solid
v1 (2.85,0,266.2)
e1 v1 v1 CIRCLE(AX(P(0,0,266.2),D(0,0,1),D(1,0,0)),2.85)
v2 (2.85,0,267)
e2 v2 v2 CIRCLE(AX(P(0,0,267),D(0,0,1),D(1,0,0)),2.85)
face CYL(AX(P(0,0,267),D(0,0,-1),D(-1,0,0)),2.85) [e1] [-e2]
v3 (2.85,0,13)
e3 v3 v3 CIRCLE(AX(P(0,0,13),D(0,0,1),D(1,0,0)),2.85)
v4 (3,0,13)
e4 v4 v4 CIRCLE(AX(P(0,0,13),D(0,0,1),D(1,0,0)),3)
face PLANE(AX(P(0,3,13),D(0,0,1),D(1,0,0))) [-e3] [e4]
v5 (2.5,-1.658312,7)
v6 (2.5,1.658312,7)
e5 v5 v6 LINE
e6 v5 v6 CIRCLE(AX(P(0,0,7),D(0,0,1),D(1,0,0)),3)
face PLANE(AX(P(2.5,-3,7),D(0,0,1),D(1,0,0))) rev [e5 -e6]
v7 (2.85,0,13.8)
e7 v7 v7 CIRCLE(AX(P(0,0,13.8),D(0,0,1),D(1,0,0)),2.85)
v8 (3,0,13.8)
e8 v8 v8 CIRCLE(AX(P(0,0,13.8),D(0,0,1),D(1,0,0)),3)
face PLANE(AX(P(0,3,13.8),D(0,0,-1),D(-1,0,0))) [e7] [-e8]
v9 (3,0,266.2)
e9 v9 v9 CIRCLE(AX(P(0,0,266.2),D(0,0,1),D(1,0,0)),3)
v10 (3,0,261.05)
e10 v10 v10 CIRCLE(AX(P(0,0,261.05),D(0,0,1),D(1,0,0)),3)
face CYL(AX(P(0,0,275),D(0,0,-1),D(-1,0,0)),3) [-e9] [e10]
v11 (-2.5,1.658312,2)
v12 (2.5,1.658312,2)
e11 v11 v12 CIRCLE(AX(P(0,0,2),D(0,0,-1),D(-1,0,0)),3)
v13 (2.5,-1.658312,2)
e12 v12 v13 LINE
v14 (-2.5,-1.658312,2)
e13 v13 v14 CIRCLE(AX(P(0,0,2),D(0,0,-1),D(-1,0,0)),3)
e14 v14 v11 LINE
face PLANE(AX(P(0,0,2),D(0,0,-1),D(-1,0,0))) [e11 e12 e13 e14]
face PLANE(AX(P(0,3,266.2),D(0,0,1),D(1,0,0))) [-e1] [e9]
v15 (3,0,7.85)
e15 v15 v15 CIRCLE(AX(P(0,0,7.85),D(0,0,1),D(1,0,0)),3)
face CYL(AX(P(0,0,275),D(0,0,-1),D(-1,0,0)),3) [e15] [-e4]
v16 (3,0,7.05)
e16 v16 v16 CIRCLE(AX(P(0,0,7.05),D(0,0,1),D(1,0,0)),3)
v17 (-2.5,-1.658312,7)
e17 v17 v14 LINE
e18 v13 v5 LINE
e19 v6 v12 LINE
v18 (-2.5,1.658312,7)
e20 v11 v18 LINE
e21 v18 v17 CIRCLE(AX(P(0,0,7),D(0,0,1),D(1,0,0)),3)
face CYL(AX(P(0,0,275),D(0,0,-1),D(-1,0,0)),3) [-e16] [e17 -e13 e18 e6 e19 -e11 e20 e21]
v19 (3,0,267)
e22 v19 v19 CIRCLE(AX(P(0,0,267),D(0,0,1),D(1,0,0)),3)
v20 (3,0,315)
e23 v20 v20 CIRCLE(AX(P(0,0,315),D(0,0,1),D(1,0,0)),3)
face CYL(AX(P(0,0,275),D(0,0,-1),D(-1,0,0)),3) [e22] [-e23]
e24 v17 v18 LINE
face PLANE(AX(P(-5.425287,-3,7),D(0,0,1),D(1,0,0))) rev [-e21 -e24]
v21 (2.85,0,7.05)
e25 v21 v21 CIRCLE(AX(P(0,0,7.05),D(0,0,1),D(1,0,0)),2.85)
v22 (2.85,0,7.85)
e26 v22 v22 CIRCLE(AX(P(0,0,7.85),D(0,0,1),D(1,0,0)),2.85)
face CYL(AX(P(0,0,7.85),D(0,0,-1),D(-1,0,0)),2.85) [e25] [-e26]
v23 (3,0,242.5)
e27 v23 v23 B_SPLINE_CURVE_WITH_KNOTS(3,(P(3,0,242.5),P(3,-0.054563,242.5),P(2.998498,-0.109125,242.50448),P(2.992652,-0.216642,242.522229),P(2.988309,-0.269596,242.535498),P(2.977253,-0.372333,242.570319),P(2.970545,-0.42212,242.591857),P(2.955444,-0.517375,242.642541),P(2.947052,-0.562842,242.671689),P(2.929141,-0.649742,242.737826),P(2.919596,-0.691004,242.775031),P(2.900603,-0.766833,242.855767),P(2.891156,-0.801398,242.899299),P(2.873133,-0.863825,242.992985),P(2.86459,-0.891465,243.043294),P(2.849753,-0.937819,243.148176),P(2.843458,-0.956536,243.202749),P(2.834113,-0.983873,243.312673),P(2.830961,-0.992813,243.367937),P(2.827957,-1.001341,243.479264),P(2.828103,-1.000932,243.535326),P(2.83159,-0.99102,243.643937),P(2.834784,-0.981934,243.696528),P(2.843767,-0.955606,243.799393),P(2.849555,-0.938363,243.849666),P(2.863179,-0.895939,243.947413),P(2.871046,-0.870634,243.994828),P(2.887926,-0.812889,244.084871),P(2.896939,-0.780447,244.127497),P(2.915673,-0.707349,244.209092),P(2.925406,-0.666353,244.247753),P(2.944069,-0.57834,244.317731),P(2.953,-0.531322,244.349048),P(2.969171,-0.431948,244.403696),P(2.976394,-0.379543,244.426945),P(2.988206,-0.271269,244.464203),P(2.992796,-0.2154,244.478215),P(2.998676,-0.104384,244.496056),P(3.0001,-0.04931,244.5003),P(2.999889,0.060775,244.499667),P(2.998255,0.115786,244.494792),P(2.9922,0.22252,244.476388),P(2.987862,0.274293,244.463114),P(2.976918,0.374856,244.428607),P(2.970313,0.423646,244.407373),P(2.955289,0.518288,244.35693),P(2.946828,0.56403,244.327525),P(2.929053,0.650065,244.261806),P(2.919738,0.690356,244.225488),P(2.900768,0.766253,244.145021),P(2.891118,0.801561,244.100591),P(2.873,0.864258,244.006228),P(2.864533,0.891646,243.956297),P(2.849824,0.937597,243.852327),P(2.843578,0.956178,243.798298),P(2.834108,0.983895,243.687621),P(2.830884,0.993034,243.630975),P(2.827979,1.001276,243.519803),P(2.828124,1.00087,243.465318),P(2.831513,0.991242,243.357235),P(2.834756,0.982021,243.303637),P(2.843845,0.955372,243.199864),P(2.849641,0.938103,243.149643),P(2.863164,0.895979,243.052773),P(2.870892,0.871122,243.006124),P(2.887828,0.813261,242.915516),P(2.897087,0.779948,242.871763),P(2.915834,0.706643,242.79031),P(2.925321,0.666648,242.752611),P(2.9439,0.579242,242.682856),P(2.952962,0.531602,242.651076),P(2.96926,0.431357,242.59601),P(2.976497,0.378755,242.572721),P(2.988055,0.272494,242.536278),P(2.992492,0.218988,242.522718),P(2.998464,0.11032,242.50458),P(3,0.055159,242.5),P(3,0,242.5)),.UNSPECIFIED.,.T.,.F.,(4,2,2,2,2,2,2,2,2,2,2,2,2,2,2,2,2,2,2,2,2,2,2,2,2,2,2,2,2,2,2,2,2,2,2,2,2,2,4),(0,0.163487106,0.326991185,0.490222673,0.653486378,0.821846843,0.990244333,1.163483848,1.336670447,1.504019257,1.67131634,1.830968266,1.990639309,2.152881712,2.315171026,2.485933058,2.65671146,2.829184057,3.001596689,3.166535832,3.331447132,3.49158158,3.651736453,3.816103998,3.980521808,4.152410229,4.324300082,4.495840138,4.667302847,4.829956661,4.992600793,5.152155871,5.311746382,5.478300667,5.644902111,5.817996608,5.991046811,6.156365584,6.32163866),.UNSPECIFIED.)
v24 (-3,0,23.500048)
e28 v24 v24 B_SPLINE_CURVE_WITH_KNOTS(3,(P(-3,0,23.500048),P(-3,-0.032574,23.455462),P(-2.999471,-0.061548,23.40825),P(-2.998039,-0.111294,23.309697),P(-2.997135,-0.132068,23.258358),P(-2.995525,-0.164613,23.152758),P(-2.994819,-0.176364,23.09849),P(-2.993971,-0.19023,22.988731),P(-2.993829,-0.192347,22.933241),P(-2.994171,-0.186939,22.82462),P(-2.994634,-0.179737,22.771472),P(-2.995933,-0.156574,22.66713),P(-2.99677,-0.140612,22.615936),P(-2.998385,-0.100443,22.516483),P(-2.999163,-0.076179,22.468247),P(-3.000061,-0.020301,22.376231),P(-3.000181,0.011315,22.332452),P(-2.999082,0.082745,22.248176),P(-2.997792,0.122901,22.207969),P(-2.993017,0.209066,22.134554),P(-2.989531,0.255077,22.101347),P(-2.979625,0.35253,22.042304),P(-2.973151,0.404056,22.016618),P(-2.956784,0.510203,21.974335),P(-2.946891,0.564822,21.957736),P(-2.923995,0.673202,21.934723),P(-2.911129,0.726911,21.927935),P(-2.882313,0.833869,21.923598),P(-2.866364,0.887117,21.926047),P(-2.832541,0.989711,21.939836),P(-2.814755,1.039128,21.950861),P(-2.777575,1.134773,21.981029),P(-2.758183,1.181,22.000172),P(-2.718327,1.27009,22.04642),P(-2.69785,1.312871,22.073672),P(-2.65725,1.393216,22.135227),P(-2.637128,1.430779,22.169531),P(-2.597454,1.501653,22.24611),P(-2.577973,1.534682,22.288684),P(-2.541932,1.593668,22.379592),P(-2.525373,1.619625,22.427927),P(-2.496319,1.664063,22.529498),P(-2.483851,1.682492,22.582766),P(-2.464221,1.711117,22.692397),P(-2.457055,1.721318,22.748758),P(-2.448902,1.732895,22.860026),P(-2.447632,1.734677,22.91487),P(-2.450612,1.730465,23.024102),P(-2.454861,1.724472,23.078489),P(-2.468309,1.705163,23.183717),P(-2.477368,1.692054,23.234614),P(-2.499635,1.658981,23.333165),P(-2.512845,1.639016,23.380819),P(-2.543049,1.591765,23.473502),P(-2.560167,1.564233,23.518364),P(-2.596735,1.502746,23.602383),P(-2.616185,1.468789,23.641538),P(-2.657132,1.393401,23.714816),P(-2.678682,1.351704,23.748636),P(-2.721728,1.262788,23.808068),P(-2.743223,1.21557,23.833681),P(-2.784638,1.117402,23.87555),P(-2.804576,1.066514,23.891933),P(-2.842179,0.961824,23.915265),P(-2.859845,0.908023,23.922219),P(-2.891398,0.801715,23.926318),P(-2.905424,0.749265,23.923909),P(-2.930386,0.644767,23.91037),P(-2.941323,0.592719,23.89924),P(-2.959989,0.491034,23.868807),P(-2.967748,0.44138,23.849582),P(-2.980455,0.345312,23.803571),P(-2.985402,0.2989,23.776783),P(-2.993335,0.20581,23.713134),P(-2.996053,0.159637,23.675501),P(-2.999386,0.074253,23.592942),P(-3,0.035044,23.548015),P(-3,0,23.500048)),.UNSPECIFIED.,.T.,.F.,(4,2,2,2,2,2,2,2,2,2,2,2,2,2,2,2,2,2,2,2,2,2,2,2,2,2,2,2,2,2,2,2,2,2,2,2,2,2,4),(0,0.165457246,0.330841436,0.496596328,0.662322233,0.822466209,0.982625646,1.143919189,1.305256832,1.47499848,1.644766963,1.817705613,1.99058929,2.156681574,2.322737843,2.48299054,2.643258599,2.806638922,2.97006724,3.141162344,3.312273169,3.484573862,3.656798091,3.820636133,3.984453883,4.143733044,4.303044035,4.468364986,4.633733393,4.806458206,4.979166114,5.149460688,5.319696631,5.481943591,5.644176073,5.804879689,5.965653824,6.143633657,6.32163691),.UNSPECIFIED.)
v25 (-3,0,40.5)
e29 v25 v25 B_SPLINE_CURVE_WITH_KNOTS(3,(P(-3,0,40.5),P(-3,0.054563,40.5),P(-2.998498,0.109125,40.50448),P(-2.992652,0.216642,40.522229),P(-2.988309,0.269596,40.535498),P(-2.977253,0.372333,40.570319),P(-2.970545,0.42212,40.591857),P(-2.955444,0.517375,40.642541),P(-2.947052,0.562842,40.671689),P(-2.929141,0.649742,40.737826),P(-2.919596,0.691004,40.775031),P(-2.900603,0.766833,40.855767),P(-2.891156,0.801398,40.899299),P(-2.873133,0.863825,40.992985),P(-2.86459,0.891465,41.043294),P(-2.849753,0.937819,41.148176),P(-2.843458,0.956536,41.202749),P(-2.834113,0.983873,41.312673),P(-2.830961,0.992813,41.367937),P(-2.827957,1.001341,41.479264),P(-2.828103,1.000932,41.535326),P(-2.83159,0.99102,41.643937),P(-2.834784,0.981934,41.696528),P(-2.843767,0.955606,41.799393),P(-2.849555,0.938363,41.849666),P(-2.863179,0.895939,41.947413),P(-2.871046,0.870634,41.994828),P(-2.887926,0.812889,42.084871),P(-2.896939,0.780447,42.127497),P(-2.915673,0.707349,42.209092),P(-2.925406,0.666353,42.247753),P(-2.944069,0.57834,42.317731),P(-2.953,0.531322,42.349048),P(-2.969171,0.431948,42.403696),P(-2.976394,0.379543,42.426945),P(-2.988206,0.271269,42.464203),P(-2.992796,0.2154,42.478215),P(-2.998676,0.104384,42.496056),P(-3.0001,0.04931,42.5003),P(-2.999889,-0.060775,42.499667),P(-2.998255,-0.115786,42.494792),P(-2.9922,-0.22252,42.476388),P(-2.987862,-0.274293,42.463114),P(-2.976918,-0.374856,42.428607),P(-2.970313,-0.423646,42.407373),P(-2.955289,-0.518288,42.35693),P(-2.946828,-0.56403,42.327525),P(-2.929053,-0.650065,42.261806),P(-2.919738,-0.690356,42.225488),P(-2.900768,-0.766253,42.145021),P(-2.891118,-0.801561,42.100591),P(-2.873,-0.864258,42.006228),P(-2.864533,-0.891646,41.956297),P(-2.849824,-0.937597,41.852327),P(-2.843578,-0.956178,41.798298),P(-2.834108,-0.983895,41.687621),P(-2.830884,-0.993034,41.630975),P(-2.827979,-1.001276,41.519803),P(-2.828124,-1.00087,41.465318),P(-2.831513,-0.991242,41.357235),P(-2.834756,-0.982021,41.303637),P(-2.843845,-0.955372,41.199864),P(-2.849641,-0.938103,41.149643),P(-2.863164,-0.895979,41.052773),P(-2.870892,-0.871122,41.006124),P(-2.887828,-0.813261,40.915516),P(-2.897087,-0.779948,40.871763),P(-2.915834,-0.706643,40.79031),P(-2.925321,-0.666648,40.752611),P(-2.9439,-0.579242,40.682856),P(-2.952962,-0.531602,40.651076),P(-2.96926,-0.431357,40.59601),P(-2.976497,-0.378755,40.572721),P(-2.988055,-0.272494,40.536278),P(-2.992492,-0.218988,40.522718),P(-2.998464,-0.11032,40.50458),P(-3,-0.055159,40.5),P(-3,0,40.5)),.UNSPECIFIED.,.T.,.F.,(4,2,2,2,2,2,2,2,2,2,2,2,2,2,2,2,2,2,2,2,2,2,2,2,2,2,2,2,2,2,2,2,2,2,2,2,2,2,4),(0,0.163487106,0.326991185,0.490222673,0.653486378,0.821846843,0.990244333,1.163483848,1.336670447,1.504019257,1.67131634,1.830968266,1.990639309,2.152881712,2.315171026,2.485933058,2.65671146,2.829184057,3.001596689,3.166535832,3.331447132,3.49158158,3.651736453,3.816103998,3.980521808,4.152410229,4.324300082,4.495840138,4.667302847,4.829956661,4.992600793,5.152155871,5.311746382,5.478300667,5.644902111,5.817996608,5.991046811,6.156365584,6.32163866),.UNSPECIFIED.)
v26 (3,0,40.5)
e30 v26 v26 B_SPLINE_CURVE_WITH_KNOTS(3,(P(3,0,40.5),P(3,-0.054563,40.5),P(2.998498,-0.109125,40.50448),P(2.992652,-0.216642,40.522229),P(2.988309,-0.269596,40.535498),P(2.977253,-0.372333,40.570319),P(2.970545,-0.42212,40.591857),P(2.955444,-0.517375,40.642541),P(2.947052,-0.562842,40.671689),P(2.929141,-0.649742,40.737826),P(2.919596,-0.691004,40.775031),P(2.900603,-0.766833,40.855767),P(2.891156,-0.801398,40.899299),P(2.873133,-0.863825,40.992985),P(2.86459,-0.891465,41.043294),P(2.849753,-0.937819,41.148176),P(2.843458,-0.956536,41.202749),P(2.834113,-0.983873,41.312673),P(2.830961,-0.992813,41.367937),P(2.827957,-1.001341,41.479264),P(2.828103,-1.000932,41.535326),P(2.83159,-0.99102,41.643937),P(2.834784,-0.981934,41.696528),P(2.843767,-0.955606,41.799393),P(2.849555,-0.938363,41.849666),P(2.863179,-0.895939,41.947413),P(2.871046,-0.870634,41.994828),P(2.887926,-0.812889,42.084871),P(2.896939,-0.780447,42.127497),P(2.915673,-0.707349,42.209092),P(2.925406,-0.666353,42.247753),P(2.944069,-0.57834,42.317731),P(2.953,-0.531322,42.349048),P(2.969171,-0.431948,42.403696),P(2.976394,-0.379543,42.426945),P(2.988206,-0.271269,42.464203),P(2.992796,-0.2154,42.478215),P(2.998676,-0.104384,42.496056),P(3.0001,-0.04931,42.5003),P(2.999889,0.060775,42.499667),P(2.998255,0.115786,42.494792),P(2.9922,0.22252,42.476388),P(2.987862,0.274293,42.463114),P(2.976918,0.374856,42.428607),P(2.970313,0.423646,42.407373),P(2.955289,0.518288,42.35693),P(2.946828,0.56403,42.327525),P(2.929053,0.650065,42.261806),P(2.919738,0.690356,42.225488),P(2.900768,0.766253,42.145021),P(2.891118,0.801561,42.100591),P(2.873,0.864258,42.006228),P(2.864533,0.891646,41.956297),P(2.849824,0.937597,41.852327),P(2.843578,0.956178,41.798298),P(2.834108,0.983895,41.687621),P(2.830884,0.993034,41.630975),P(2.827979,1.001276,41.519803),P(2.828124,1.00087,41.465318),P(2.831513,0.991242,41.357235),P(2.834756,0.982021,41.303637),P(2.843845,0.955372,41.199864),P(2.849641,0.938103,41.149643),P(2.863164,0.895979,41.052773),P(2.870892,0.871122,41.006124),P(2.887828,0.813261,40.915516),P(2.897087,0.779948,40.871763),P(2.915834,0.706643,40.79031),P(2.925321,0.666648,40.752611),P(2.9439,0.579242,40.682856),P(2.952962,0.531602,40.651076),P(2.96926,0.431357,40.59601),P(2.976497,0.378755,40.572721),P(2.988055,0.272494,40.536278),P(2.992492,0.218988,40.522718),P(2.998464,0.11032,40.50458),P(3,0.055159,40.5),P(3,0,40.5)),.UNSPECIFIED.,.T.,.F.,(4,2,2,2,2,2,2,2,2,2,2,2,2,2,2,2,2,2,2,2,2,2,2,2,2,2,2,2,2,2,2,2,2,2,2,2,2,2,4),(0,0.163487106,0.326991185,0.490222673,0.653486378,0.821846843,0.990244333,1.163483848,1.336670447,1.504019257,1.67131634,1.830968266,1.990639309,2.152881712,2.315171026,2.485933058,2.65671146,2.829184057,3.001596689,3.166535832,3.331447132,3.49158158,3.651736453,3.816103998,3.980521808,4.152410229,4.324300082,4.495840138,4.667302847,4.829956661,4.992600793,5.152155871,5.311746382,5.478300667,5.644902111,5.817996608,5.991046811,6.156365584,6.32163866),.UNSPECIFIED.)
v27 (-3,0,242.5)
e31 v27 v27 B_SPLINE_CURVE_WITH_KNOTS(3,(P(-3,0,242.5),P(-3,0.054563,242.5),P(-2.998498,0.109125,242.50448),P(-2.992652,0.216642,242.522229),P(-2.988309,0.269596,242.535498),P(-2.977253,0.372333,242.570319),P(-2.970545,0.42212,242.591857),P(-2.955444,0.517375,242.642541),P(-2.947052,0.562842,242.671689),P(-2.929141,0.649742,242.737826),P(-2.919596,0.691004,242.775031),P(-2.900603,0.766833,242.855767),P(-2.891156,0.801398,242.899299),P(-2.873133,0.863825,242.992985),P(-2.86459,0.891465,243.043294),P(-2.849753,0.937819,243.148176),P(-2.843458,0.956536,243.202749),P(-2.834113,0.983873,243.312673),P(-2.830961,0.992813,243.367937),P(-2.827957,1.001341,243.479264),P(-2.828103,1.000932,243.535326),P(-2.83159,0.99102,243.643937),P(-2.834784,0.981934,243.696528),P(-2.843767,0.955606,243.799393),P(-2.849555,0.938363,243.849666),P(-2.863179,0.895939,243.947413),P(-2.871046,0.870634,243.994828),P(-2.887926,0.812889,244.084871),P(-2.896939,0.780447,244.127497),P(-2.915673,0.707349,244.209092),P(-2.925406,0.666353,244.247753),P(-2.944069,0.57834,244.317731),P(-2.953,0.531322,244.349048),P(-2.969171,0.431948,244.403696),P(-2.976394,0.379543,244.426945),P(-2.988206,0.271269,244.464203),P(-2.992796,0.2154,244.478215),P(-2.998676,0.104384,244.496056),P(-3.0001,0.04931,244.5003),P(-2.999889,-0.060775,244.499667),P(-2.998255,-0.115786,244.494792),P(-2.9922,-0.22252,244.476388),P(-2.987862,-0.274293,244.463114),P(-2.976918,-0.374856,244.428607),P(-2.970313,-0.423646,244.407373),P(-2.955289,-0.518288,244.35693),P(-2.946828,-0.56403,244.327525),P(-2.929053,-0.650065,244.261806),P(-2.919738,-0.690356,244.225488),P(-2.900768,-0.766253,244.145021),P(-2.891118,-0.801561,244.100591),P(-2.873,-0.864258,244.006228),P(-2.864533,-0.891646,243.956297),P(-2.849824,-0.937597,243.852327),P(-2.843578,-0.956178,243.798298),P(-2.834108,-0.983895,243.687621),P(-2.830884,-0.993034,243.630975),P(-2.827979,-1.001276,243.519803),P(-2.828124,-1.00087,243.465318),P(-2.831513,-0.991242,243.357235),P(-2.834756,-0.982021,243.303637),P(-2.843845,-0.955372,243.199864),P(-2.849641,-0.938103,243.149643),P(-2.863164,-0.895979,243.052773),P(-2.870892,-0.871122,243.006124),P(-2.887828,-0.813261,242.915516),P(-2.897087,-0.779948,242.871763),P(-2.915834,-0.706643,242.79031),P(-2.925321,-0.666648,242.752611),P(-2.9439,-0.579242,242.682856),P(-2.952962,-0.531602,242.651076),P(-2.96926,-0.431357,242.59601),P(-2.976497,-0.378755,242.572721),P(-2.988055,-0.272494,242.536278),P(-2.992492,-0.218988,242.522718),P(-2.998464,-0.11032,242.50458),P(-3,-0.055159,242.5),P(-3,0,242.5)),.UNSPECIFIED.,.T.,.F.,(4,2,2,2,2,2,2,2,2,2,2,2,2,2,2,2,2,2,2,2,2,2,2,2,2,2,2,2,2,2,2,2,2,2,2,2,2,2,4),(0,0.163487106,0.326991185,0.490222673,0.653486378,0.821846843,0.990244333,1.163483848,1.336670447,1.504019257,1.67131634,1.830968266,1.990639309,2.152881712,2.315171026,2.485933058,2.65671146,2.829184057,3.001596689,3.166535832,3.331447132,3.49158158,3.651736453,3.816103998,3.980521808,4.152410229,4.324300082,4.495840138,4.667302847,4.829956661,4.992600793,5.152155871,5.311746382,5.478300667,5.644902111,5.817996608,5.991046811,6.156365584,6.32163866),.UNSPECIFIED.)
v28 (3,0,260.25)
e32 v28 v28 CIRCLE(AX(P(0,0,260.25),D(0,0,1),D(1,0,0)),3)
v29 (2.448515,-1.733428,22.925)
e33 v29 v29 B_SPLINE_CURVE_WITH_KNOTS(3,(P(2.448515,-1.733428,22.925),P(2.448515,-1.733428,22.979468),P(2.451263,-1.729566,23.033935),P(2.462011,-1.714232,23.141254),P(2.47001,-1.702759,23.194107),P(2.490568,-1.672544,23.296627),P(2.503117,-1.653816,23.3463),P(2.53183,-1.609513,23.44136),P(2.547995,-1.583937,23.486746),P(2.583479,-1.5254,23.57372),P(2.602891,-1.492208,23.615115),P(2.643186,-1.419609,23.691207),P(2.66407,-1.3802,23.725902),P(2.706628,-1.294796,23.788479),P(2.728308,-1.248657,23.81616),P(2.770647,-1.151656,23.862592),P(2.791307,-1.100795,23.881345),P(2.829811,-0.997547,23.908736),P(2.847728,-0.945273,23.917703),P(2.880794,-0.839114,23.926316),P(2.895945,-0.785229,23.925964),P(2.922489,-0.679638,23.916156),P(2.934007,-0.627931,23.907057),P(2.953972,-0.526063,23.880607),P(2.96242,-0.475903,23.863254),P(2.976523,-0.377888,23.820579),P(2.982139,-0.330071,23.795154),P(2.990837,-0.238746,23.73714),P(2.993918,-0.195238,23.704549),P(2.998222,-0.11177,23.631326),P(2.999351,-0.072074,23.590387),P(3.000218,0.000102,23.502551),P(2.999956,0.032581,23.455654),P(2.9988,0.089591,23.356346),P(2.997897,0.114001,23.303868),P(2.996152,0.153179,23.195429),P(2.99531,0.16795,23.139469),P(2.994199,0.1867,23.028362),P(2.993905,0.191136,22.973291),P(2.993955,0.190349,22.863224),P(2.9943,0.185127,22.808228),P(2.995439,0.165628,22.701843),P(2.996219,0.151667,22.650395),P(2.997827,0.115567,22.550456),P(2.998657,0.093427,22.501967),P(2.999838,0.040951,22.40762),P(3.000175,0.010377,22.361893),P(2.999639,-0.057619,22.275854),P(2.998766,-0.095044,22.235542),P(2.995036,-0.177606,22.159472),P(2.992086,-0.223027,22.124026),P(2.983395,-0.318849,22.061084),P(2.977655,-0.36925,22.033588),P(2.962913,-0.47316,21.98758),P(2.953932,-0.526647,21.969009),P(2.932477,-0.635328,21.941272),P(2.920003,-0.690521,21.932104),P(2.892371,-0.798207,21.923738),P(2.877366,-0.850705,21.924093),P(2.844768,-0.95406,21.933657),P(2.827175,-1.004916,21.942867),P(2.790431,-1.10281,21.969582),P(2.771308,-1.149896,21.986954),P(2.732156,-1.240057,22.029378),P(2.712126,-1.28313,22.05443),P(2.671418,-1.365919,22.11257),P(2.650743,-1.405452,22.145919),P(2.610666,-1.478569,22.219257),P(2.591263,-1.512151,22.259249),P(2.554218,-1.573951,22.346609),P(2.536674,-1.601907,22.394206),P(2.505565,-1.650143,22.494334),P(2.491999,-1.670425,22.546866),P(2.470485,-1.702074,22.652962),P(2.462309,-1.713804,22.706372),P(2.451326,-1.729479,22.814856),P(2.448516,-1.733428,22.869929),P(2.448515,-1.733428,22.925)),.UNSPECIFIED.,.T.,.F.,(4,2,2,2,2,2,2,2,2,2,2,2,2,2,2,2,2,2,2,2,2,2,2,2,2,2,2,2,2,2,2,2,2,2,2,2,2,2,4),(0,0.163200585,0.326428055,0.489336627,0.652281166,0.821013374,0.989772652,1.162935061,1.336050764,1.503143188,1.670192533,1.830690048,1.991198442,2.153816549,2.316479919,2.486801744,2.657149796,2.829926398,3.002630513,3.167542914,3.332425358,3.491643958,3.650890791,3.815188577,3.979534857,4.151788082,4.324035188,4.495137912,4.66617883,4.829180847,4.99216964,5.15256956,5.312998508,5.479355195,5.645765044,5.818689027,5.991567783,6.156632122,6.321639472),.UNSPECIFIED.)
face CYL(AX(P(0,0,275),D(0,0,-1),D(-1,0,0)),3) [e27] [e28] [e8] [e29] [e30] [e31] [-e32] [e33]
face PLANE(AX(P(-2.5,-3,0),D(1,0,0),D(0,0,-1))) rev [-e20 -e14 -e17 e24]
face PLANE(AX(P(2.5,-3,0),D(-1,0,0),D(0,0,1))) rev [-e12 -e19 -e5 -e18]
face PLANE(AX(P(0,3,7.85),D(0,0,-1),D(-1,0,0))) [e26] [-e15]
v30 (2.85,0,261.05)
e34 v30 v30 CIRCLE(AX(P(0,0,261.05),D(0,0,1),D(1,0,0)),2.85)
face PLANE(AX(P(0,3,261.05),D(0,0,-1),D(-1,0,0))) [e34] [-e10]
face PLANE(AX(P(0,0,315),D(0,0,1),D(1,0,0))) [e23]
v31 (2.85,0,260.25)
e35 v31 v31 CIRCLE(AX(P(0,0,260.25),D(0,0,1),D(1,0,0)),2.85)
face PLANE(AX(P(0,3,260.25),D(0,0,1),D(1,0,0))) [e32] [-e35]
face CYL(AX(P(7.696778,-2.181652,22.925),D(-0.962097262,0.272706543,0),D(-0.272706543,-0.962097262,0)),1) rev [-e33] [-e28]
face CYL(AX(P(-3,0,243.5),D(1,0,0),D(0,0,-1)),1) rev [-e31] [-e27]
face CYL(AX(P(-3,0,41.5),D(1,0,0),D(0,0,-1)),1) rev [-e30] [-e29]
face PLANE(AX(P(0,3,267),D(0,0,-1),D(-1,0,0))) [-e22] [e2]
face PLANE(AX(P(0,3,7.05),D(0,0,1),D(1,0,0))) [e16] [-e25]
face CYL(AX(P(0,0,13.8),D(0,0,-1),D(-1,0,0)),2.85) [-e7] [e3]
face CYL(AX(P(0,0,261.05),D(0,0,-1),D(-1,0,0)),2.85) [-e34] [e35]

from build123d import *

# Parameters (mm, degrees)
SKETCH1_R                                  = 3
BOSS_EXTRUDE1_DEPTH                        = 275
SKETCH3_W                                  = 0.8
SKETCH3_H                                  = 0.5
CUT_EXTRUDE2_DEPTH                         = 276.032725326
CUT_EXTRUDE2_DEPTH_BACK                    = 276.032725326
SKETCH4_W                                  = 3.470061058
SKETCH4_H                                  = 7
SKETCH4_W_2                                = 2.92528695
CHAMFER1_SIZE                              = 0.3
RETAINING_GROOVES_D5P7_1_START             = 7.05
SKETCH5_R                                  = 2.85
SKETCH5_R_2                                = 2.49
RETAINING_GROOVES_D5P7_1_DEPTH             = 0.8
RETAINING_GROOVES_D5P7_2_START             = 13
SKETCH6_R                                  = 2.85
SKETCH6_R_2                                = 2.49
RETAINING_GROOVES_D5P7_2_DEPTH             = 0.8
RETAINING_GROOVES_D5P7_3_START             = 260.25
SKETCH7_R                                  = 2.85
SKETCH7_R_2                                = 2.49
RETAINING_GROOVES_D5P7_3_DEPTH             = 0.8
RETAINING_GROOVES_D5P7_4_START             = 266.2
SKETCH8_R                                  = 2.85
SKETCH8_R_2                                = 2.49
RETAINING_GROOVES_D5P7_4_DEPTH             = 0.8
TWO_HUB_CROSS_PIN_D2_DEPTH                 = 276.032725326
TWO_HUB_CROSS_PIN_D2_DEPTH_BACK            = 276.032725326
SKETCH9_R                                  = 1
SKETCH10_R                                 = 3.1
REVB_LOWER_SHAFT_NOSE_CLEARANCE_2MM_DEPTH  = 2
REVB_OLDHAM_D2_DRIVE_PIN_CLOCKED_HOLE_OU_W = 1
REVB_OLDHAM_D2_DRIVE_PIN_CLOCKED_HOLE_OU_H = 6.000106441
BENCH_ONEPIECE_SHAFT_END_TO315_START       = 275
SKETCH11_R                                 = 3
BENCH_ONEPIECE_SHAFT_END_TO315_DEPTH       = 40


# Read off the part's stored shape, not the designer's step: RevB_Oldham_D2_Drive_Pin_Clocked_Hole
with BuildPart() as part:
    # Sketch1 → Boss-Extrude1 (new body)
    with BuildSketch(Plane.XY):
        Circle(SKETCH1_R)
    extrude(amount=BOSS_EXTRUDE1_DEPTH)

    # Sketch3 → Cut-Revolve1 (revolve, cut)
    with BuildSketch(Plane(origin=(0, 0, 0), x_dir=(0, 0, -1), z_dir=(1, 0, 0)), mode=Mode.PRIVATE) as cut_revolve1_sk:
        with Locations((-266.6, 2.75)):
            Rectangle(SKETCH3_W, SKETCH3_H)
        with Locations((-260.65, 2.75)):
            Rectangle(SKETCH3_W, SKETCH3_H)
        with Locations((-13.4, 2.75)):
            Rectangle(SKETCH3_W, SKETCH3_H)
        with Locations((-7.45, 2.75)):
            Rectangle(SKETCH3_W, SKETCH3_H)
    revolve(cut_revolve1_sk.sketch.rotate(Axis((0, 0, 263.365004794), (0, 0, -1)), 90), axis=Axis((0, 0, 263.365004794), (0, 0, -1)), mode=Mode.SUBTRACT)

    # Sketch4 → Cut-Extrude2 (cut, two sides: drawn at the far end of the back side and taken through both)
    with BuildSketch(Plane(origin=(0, 0, 0), x_dir=(1, 0, 0), z_dir=(0, 1, 0)).offset(-CUT_EXTRUDE2_DEPTH_BACK)):
        with Locations((4.235030529, -3.5)):
            Rectangle(SKETCH4_W, SKETCH4_H)
        with Locations((-3.962643475, -3.5)):
            Rectangle(SKETCH4_W_2, SKETCH4_H)
    extrude(amount=CUT_EXTRUDE2_DEPTH + CUT_EXTRUDE2_DEPTH_BACK, mode=Mode.SUBTRACT)

    # Chamfer1
    chamfer1_edges = [part.edges().sort_by_distance(p)[0] for p in [
        (0, 3, 0),
        (0, -3, 0),
    ]]
    chamfer(chamfer1_edges, length=CHAMFER1_SIZE)

    # Sketch5 → Retaining_Grooves_D5p7_1 (add)
    with BuildSketch(Plane.XY.offset(RETAINING_GROOVES_D5P7_1_START)):
        Circle(SKETCH5_R)
        Circle(SKETCH5_R_2, mode=Mode.SUBTRACT)
    extrude(amount=RETAINING_GROOVES_D5P7_1_DEPTH)

    # Sketch6 → Retaining_Grooves_D5p7_2 (add)
    with BuildSketch(Plane.XY.offset(RETAINING_GROOVES_D5P7_2_START)):
        Circle(SKETCH6_R)
        Circle(SKETCH6_R_2, mode=Mode.SUBTRACT)
    extrude(amount=RETAINING_GROOVES_D5P7_2_DEPTH)

    # Sketch7 → Retaining_Grooves_D5p7_3 (add)
    with BuildSketch(Plane.XY.offset(RETAINING_GROOVES_D5P7_3_START)):
        Circle(SKETCH7_R)
        Circle(SKETCH7_R_2, mode=Mode.SUBTRACT)
    extrude(amount=RETAINING_GROOVES_D5P7_3_DEPTH)

    # Sketch8 → Retaining_Grooves_D5p7_4 (add)
    with BuildSketch(Plane.XY.offset(RETAINING_GROOVES_D5P7_4_START)):
        Circle(SKETCH8_R)
        Circle(SKETCH8_R_2, mode=Mode.SUBTRACT)
    extrude(amount=RETAINING_GROOVES_D5P7_4_DEPTH)

    # Sketch9 → Two_Hub_Cross_Pin_D2 (cut, two sides: drawn at the far end of the back side and taken through both)
    with BuildSketch(Plane(origin=(0, 0, 0), x_dir=(0, 0, -1), z_dir=(1, 0, 0)).offset(-TWO_HUB_CROSS_PIN_D2_DEPTH_BACK)):
        with Locations((-41.5, 0)):
            Circle(SKETCH9_R)
        with Locations((-243.5, 0)):
            Circle(SKETCH9_R)
    extrude(amount=TWO_HUB_CROSS_PIN_D2_DEPTH + TWO_HUB_CROSS_PIN_D2_DEPTH_BACK, mode=Mode.SUBTRACT)

    # Sketch10 → RevB_Lower_Shaft_Nose_Clearance_2mm (cut)
    with BuildSketch(Plane(origin=(0, 0, 0), x_dir=(-1, 0, 0), z_dir=(0, 0, -1))):
        Circle(SKETCH10_R)
    extrude(amount=-REVB_LOWER_SHAFT_NOSE_CLEARANCE_2MM_DEPTH, mode=Mode.SUBTRACT)

    # RevB_Oldham_D2_Drive_Pin_Clocked_Hole ou → RevB_Oldham_D2_Drive_Pin_Clocked_Hole (revolve, cut)
    with BuildSketch(Plane(origin=(0, 0, 22.925), x_dir=(0.2727065426398811, 0.962097262027807, 0), z_dir=(0, 0, -1))):
        with Locations((0.5, 2.6843e-05)):
            Rectangle(REVB_OLDHAM_D2_DRIVE_PIN_CLOCKED_HOLE_OU_W, REVB_OLDHAM_D2_DRIVE_PIN_CLOCKED_HOLE_OU_H)
    revolve(axis=Axis((0, 0, 22.925), (0.962097262027807, -0.2727065426398811, 0)), mode=Mode.SUBTRACT)

    # Sketch11 → Bench_OnePiece_Shaft_End_To315 (add)
    with BuildSketch(Plane.XY.offset(BENCH_ONEPIECE_SHAFT_END_TO315_START)):
        with Locations(Location((0, 0, 0), (0, 0, 213.557309762))):
            Circle(SKETCH11_R)
    extrude(amount=BENCH_ONEPIECE_SHAFT_END_TO315_DEPTH)


solid = part.part
